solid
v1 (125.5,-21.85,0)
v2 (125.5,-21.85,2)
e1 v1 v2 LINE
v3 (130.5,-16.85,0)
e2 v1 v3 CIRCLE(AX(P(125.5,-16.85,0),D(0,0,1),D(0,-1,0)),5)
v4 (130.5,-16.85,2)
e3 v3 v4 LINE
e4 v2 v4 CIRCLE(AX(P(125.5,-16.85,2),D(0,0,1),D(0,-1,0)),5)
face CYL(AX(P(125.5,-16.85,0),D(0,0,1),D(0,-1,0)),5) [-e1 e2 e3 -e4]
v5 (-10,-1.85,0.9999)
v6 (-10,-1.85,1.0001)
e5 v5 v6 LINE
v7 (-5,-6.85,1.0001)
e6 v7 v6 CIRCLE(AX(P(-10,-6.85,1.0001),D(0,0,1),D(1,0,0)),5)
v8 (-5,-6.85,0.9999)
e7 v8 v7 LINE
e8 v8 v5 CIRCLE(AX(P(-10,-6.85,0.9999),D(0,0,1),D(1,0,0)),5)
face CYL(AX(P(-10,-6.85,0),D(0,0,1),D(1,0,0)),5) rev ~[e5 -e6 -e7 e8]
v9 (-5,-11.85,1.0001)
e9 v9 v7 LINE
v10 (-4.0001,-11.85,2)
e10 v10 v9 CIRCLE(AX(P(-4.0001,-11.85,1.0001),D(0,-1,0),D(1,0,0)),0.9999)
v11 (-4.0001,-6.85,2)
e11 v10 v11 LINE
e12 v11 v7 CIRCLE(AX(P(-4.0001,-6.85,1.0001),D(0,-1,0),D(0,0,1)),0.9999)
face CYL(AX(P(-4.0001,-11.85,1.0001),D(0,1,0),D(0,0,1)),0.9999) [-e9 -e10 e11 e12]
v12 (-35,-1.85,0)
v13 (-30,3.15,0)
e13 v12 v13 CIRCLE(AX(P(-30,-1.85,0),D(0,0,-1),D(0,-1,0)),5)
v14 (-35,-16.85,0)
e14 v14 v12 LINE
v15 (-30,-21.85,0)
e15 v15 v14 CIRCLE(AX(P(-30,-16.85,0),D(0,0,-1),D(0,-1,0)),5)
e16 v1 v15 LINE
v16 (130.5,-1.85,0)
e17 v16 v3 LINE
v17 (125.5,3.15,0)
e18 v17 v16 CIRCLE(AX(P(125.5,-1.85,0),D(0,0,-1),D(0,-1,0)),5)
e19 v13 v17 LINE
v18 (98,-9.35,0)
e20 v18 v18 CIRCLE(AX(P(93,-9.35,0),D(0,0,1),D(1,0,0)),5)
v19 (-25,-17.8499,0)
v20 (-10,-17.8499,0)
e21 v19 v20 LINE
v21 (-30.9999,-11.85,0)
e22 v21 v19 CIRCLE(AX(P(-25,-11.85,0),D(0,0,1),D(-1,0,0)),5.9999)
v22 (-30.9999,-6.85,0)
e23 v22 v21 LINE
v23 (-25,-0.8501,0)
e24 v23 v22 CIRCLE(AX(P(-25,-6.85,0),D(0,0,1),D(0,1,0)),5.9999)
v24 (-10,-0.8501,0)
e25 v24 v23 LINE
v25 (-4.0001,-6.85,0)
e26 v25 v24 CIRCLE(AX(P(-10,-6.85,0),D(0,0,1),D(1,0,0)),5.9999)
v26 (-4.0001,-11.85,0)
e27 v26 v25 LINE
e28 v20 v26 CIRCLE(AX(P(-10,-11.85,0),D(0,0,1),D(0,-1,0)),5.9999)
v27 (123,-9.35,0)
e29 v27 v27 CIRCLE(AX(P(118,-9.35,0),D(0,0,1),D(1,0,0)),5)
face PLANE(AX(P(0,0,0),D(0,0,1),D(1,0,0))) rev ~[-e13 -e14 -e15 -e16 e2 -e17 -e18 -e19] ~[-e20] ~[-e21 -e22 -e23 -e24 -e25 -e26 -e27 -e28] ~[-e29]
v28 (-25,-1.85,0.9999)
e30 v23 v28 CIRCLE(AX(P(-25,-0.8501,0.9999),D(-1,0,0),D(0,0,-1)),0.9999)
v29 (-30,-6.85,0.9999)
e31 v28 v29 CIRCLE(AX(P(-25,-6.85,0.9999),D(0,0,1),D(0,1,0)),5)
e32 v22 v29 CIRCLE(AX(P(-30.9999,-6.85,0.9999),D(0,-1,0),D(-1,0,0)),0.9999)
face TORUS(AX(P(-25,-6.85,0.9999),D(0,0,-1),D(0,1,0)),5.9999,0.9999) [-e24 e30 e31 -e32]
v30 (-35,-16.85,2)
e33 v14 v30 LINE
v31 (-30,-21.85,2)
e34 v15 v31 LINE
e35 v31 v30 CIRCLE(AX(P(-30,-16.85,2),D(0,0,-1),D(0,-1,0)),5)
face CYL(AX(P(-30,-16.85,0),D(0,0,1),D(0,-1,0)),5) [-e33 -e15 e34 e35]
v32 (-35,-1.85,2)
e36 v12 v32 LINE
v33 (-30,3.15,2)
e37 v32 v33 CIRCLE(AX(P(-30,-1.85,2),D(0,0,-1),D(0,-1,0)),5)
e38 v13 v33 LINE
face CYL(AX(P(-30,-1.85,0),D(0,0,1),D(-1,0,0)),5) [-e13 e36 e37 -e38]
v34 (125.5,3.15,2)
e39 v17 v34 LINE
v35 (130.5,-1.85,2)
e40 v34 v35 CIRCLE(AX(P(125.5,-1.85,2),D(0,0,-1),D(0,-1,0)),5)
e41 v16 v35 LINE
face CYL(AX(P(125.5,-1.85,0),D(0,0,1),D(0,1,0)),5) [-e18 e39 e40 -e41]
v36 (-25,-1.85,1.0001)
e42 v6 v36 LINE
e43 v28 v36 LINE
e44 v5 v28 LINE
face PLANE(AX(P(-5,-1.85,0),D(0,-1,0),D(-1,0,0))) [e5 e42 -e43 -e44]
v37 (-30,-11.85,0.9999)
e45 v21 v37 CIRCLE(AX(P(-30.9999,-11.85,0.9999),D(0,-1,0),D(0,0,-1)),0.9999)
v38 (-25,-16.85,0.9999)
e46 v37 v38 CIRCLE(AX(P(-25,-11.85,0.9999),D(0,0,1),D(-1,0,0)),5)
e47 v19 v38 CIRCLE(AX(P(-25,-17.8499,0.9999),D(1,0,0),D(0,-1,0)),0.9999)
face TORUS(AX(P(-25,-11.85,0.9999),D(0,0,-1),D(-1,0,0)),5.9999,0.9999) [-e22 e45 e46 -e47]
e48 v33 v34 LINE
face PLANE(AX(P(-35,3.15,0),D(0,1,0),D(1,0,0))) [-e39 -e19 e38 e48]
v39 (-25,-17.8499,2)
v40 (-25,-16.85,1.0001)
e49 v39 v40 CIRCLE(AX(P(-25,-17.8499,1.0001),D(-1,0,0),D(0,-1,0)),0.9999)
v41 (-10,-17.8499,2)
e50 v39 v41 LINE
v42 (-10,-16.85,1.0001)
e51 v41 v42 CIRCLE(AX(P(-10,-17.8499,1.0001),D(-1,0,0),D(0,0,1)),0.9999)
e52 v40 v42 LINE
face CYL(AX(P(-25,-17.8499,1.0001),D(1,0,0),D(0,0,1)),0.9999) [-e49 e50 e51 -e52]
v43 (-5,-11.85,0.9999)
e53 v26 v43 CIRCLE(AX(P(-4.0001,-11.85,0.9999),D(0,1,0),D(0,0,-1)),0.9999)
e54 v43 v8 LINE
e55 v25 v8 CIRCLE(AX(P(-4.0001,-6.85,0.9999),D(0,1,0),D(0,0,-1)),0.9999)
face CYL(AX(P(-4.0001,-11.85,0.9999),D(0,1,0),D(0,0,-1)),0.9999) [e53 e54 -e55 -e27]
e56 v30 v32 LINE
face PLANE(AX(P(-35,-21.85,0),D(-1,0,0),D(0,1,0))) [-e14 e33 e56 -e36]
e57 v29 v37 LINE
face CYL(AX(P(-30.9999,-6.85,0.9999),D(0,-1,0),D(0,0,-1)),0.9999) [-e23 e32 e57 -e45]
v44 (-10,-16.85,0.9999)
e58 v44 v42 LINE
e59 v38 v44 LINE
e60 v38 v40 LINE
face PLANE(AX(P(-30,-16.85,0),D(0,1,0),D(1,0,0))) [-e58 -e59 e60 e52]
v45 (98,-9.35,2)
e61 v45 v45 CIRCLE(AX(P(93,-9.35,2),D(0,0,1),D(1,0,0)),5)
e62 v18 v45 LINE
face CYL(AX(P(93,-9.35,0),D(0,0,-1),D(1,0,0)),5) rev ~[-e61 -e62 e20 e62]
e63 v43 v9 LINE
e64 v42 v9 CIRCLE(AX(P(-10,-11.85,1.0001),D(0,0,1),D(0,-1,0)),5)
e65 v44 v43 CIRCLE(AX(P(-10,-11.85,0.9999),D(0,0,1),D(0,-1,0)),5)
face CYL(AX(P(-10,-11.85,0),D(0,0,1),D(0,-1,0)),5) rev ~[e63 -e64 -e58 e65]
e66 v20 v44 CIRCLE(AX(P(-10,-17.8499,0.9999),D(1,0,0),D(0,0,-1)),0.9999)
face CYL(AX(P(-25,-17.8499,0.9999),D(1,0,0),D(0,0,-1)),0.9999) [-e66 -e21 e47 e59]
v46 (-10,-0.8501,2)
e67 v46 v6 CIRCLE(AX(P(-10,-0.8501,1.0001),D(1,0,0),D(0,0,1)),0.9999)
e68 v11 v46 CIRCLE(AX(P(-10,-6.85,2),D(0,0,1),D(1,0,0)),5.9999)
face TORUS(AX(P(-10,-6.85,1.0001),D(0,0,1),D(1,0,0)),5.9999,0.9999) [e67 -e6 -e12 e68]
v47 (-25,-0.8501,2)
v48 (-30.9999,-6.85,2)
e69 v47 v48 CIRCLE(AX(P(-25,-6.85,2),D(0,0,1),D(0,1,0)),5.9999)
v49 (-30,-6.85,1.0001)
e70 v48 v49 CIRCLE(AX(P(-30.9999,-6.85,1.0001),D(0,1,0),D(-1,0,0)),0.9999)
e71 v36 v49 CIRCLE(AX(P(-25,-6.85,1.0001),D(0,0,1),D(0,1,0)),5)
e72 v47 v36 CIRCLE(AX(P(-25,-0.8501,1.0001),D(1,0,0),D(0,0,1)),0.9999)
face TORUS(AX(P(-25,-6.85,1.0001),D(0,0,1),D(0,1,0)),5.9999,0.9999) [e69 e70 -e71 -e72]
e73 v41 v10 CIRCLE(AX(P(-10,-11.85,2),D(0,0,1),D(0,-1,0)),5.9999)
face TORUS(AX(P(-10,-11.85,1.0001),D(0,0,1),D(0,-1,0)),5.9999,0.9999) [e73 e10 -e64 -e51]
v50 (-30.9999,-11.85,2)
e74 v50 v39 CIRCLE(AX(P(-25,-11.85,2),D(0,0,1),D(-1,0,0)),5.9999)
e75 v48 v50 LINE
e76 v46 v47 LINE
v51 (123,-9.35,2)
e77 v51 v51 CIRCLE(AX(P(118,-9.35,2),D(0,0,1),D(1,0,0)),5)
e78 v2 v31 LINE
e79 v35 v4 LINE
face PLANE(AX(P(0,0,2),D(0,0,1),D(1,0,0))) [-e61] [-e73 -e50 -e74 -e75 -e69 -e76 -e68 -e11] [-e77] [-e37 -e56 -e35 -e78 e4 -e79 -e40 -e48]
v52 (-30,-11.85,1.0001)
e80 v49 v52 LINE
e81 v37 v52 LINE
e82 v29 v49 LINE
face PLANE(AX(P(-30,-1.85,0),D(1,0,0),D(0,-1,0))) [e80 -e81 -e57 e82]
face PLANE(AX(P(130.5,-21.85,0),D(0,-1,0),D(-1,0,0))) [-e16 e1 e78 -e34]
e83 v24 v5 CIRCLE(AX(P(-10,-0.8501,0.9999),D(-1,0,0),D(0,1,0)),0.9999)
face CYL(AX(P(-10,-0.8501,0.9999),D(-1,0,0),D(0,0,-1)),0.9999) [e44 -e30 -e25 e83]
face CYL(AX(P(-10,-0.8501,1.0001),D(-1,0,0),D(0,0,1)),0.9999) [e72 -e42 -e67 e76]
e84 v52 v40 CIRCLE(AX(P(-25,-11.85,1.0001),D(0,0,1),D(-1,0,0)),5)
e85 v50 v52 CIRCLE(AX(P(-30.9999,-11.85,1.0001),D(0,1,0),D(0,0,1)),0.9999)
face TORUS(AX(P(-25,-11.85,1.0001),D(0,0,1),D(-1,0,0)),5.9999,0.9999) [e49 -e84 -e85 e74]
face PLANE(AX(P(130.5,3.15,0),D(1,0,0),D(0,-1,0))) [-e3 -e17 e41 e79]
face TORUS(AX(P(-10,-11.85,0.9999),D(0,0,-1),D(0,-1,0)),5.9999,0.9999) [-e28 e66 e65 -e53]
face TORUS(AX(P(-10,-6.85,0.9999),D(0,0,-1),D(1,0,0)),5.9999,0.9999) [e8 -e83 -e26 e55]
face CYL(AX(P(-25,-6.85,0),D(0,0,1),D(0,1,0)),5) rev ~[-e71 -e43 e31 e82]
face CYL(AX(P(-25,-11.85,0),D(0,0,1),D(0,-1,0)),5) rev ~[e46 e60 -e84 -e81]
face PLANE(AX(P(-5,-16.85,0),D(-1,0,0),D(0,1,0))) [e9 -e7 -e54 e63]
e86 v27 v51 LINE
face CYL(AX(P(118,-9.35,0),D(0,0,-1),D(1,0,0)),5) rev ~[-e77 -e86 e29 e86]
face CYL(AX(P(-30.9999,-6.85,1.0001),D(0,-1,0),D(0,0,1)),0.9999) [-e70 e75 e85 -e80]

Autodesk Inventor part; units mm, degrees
ref_plane "YZ Plane" through (0, 0, 0) normal (1, 0, 0) x (0, 1, 0)
ref_plane "XZ Plane" through (0, 0, 0) normal (0, 1, 0) x (-1, 0, 0)
ref_plane "XY Plane" through (0, 0, 0) normal (0, 0, 1) x (1, 0, 0)
ref_plane "Arbeitsebene1" through (0, 0, 0) normal (0, 0, 1) x (1, 0, 0)
sketch "Skizze1" plane through (0, 0, 0) normal (0, 0, 1) x (1, 0, 0)
  circle A0 centre (118, -9.35) radius 5 construction
  circle A1 centre (118, -9.35) radius 5
  circle A2 centre (93, -9.35) radius 5 construction
  circle A3 centre (93, -9.35) radius 5
  line L0 (130.5, -21.85) -> (-35, -21.85)
  line L1 (-35, -21.85) -> (-35, 3.15)
  line L2 (-35, 3.15) -> (130.5, 3.15)
  line L3 (130.5, 3.15) -> (130.5, -21.85)
  line L4 (-30, -16.85) -> (-5, -16.85)
  line L5 (-5, -16.85) -> (-5, -1.85)
  line L6 (-5, -1.85) -> (-30, -1.85)
  line L7 (-30, -1.85) -> (-30, -16.85)
  line L8 (0, -2.2) -> (0, -28) construction
  point P0 (0, 0)
  dimension "d0" = 12.5
  dimension "d1" = 25
  dimension "d2" = 12.5
  dimension "d3" = 5
  dimension "d4" = 5
  dimension "d5" = 5
  dimension "d6" = 25
  dimension "d7" = 5
  dimension "d8" = 15
extrude "Extrusion1" add sketch "Skizze1" along normal blind 2
fillet "Rundung1" radius 5 8 edges at (-5, -16.85, 1) (-30, -16.85, 1) (-30, -1.85, 1) (-5, -1.85, 1) (-35, -21.85, 1) (-35, 3.15, 1) (130.5, -21.85, 1) (130.5, 3.15, 1)
fillet "Rundung2" radius 1 16 edges at (-17.5, -1.85, 2) (-28.5355, -3.3145, 2) (-30, -9.35, 2) (-28.5355, -15.3855, 2) (-17.5, -16.85, 2) (-6.4645, -15.3855, 2) (-5, -9.35, 2) (-6.4645, -3.3145, 2) (-5, -9.35, 0) (-6.4645, -15.3855, 0) (-17.5, -16.85, 0) (-28.5355, -15.3855, 0) (-30, -9.35, 0) (-28.5355, -3.3145, 0) (-17.5, -1.85, 0) (-6.4645, -3.3145, 0)
equation "\"d1\" = 2 * d0"
equation "\"d2\" = d0"
equation "\"d4\" = d3"
equation "\"d5\" = d3"
equation "\"d7\" = d3"
properties part number "hangmount"
